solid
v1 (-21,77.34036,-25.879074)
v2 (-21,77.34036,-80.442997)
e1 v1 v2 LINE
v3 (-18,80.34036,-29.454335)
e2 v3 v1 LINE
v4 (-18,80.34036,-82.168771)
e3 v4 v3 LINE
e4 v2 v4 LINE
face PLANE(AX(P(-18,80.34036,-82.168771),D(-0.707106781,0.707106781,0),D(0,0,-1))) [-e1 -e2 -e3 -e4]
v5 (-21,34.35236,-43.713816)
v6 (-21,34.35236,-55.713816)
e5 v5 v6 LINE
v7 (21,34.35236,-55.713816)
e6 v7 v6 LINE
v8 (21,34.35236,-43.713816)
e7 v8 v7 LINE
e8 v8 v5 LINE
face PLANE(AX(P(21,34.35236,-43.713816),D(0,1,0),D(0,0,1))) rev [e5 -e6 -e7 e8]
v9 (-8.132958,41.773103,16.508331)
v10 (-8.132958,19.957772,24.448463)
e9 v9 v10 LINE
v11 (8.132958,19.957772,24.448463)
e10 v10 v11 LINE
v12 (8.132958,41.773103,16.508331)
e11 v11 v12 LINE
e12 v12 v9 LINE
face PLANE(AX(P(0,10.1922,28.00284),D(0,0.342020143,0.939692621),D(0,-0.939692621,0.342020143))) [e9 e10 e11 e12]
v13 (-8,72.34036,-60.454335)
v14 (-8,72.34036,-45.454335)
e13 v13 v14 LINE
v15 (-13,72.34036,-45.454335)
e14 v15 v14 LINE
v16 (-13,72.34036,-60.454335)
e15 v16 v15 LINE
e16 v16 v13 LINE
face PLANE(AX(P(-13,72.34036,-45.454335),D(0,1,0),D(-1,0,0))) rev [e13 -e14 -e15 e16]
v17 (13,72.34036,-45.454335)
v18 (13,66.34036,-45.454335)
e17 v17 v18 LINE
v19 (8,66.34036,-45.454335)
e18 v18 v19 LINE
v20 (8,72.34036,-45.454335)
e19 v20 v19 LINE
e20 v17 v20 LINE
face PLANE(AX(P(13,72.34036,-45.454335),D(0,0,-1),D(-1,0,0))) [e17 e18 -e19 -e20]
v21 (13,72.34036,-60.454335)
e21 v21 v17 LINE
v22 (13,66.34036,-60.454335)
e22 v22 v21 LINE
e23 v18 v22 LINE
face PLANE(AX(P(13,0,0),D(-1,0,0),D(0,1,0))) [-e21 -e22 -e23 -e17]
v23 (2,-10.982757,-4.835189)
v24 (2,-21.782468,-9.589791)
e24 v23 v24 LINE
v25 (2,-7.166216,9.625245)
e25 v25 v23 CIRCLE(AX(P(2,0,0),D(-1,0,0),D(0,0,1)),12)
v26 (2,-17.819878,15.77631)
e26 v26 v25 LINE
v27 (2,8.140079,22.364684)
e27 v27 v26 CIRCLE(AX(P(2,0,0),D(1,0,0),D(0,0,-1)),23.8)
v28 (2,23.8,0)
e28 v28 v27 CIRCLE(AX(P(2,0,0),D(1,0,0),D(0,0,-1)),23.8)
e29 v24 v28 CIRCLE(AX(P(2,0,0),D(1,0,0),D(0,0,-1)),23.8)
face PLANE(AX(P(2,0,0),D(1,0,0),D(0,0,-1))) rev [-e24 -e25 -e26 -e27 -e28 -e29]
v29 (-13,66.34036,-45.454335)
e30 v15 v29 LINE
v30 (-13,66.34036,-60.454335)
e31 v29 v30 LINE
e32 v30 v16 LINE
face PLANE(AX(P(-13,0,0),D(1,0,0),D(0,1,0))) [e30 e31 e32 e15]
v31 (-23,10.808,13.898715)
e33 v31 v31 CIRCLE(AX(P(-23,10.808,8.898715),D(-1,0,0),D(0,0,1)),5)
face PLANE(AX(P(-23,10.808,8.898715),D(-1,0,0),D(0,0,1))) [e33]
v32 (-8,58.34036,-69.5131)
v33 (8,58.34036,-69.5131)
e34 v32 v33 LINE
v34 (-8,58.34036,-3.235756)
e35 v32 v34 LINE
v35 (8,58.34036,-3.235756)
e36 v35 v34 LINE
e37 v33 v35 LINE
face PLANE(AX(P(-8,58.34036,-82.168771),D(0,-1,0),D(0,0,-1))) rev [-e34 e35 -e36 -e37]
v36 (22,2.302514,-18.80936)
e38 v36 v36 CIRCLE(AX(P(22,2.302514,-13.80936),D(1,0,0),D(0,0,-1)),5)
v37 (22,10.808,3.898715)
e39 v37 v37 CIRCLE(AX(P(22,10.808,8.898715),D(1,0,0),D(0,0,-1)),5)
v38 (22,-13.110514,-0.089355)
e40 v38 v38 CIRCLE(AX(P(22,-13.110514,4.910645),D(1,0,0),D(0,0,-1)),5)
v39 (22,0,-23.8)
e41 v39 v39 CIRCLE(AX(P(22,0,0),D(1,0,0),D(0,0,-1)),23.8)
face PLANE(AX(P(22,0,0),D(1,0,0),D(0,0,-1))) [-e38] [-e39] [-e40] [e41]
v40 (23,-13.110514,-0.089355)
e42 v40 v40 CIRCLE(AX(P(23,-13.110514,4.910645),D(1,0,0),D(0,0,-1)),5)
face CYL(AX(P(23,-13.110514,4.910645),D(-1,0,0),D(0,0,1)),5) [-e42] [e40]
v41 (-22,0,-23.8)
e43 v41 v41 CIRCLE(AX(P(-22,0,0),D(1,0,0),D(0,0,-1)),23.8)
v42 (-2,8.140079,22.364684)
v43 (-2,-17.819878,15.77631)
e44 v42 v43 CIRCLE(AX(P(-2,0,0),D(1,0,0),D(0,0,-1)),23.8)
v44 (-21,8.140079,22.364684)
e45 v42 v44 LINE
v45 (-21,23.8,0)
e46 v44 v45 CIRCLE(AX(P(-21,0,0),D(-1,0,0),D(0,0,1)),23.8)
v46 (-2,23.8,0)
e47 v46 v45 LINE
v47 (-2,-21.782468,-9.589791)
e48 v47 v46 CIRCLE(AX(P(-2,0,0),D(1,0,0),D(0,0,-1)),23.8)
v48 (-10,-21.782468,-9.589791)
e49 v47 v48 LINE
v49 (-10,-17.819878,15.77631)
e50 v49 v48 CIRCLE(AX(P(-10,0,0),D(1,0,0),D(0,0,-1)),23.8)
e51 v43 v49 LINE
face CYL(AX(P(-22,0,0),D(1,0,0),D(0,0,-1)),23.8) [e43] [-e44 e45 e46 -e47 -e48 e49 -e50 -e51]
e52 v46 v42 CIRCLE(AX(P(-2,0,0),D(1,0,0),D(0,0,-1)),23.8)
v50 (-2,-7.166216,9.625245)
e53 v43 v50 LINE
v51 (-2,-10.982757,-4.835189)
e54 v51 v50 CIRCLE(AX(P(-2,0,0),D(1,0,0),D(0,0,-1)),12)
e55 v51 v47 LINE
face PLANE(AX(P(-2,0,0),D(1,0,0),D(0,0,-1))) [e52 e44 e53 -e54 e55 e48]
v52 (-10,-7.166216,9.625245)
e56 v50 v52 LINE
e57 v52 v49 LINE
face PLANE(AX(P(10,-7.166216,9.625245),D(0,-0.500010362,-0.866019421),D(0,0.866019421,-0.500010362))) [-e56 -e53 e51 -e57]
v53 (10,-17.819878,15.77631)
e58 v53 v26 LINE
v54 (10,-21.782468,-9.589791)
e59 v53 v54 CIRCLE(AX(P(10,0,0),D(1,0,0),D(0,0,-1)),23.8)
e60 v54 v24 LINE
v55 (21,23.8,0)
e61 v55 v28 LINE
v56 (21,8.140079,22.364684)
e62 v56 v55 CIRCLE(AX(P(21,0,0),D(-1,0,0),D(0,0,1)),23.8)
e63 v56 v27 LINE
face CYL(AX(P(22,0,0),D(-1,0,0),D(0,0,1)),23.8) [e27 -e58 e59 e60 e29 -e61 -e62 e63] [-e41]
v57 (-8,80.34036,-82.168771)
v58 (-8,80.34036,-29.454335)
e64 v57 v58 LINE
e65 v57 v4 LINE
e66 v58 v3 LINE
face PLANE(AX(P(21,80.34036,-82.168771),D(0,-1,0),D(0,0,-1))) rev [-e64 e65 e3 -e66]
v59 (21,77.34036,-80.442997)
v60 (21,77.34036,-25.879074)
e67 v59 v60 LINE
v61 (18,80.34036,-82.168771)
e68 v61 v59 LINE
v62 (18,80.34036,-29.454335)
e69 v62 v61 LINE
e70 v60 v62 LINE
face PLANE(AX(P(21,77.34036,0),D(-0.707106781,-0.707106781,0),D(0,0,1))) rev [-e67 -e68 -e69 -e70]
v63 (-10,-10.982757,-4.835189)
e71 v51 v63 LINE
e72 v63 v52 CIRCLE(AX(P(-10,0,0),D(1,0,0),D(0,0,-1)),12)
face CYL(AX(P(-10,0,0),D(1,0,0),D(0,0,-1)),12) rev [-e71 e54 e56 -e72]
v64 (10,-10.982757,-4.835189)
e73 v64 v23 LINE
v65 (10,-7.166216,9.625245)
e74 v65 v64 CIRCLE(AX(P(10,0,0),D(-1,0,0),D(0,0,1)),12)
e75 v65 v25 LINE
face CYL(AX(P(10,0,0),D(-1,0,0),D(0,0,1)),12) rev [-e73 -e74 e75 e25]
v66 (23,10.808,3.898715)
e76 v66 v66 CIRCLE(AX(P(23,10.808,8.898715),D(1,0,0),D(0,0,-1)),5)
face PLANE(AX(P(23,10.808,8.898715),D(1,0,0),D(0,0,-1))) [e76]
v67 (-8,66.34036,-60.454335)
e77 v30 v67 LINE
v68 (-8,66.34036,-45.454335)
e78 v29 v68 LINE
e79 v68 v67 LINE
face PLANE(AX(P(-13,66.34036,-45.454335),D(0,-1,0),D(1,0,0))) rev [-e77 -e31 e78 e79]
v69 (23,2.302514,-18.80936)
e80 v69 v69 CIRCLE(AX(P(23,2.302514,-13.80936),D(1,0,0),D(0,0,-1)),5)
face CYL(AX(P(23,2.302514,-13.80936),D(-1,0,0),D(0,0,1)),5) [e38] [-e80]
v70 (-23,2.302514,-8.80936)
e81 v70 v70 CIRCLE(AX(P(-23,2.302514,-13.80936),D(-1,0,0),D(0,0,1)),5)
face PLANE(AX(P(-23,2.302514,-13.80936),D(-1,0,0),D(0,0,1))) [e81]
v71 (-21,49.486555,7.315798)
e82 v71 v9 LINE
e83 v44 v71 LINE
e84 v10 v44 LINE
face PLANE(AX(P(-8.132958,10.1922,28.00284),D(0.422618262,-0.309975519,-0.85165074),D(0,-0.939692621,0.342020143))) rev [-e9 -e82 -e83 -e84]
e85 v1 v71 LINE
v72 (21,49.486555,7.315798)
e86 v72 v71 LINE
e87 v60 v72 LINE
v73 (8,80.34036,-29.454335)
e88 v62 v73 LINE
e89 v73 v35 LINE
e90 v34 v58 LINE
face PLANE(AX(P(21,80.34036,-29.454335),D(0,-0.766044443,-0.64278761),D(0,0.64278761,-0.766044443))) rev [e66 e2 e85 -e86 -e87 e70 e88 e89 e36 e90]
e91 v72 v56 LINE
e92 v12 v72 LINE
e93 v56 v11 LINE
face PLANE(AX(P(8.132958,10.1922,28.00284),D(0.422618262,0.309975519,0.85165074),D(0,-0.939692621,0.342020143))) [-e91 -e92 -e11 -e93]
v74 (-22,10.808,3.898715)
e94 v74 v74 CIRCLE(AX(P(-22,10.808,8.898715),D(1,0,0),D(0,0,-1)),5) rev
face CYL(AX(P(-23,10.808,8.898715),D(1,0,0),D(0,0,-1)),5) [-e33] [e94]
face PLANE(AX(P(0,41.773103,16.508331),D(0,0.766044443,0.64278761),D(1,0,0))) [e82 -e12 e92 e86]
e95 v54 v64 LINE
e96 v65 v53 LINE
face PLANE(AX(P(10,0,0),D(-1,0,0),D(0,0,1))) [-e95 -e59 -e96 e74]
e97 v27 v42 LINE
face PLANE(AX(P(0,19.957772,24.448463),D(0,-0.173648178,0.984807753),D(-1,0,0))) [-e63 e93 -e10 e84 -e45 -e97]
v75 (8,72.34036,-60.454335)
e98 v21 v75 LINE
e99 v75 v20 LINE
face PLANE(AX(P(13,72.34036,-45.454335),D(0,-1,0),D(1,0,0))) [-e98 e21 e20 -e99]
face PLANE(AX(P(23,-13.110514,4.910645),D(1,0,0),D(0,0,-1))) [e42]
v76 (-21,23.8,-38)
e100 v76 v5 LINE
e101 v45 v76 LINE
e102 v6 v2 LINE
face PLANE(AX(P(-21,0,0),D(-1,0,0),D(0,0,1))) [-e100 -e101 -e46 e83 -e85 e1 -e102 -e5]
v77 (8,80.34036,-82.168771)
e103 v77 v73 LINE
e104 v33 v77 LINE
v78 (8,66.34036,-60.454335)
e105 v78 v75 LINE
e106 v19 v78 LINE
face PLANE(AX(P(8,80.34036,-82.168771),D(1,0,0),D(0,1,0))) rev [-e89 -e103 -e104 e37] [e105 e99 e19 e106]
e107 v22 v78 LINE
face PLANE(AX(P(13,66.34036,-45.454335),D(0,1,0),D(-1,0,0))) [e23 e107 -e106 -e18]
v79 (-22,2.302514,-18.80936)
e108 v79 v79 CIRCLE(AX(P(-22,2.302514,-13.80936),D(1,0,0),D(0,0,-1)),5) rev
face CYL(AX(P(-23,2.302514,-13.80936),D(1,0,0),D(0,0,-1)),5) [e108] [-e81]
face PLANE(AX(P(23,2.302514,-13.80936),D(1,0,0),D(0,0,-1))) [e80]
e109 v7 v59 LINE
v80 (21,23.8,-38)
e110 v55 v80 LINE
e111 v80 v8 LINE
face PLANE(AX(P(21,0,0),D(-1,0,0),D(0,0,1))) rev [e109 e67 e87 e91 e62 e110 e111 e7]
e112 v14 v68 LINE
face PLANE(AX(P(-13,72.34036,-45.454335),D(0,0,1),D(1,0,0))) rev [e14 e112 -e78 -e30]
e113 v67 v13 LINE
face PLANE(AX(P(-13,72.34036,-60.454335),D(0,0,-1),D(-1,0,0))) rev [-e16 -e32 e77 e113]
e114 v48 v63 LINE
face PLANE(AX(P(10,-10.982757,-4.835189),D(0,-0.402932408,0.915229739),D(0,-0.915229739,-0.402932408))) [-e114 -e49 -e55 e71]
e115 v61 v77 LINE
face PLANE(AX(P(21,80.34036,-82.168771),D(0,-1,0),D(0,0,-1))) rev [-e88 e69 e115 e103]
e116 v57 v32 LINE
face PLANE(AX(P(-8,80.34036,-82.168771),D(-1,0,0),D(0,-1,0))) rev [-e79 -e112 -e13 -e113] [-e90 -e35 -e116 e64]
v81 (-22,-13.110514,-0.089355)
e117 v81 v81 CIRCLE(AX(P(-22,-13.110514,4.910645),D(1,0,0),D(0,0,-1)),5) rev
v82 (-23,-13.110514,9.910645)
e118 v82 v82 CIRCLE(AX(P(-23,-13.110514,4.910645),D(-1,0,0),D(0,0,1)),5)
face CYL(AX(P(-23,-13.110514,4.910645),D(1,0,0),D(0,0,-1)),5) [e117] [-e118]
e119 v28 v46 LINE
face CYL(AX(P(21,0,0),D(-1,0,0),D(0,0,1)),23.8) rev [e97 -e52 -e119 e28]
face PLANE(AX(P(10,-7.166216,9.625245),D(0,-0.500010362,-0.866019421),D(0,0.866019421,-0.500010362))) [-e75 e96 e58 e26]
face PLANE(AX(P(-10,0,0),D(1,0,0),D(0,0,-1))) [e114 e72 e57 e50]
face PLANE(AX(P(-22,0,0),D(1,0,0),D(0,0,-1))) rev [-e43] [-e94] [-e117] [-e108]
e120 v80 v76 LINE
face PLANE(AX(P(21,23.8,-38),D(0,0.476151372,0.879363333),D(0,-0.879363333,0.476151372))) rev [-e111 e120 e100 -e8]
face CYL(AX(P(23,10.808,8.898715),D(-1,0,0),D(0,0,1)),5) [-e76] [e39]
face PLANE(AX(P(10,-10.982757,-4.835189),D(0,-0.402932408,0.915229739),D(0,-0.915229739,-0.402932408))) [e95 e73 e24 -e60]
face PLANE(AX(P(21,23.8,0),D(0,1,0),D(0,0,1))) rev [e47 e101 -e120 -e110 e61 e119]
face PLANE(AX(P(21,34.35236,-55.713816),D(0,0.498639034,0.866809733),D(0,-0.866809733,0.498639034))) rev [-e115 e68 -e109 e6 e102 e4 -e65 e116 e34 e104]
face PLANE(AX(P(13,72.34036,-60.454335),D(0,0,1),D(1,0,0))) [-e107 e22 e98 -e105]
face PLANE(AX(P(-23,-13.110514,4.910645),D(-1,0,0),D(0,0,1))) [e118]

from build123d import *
from OCP.BRepFilletAPI import BRepFilletAPI_MakeChamfer

# Parameters (mm, degrees)
BOSS_EXTRUDE1_START     = 1
SKETCH1_R               = 11.9
BOSS_EXTRUDE1_DEPTH     = 10
BOSS_EXTRUDE3_START     = -1
SKETCH1_3_R             = 11.9
BOSS_EXTRUDE3_DEPTH     = 10
SKETCH3_R               = 6
CUT_EXTRUDE1_DEPTH      = 4
SKETCH4_R               = 6
CUT_EXTRUDE2_DEPTH      = 4
BOSS_EXTRUDE9_DEPTH     = 10.5
BOSS_EXTRUDE10_DEPTH    = 3
CHAMFER4_SIZE           = 3
CHAMFER4_SIZE_2         = 5.196152423
CHAMFER5_SIZE           = 3
CHAMFER5_SIZE2          = 6.433520761528718
SKETCH17_R              = 2.500000000000001
SKETCH17_R_2            = 2.500000000000368
SKETCH17_R_3            = 2.5000000000002682
BOSS_EXTRUDE11_DEPTH    = 0.5
BOSS_EXTRUDE12_START    = 0.5
SKETCH18_R              = 2.5000000000000013
SKETCH18_R_2            = 2.5000000000003686
SKETCH18_R_3            = 2.500000000000268
BOSS_EXTRUDE12_DEPTH    = 0.5
CUT_EXTRUDE4_DEPTH      = 59.59880616896635
CHAMFER6_SIZE           = 1.5
SCALE1_SCALE            = 2
SKETCH20_W              = 15
SKETCH20_H              = 6
CUT_EXTRUDE5_DEPTH      = 5
CUT_EXTRUDE8_DEPTH      = 12
CUT_EXTRUDE8_DEPTH_BACK = 8


with BuildPart() as part:
    # Sketch1 → Boss-Extrude1 (new body)
    with BuildSketch(Plane(origin=(0, 0, 0), x_dir=(0, 0, -1), z_dir=(1, 0, 0)).offset(BOSS_EXTRUDE1_START)):
        Circle(SKETCH1_R)
    extrude(amount=BOSS_EXTRUDE1_DEPTH)

    # Sketch4 → Cut-Extrude2 (cut)
    with BuildSketch(Plane.ZY.offset(-1)):
        with Locations(Location((0, 0, 0), (0, 0, 180))):
            Circle(SKETCH4_R)
    extrude(amount=-CUT_EXTRUDE2_DEPTH, mode=Mode.SUBTRACT)



with BuildPart() as body_2:
    # Sketch1<3> → Boss-Extrude3 (new body)
    with BuildSketch(Plane(origin=(0, 0, 0), x_dir=(0, 0, -1), z_dir=(1, 0, 0)).offset(BOSS_EXTRUDE3_START)):
        Circle(SKETCH1_3_R)
    extrude(amount=-BOSS_EXTRUDE3_DEPTH)

    # Sketch3 → Cut-Extrude1 (cut)
    with BuildSketch(Plane(origin=(-1, 0, 0), x_dir=(0, 0, -1), z_dir=(1, 0, 0))):
        Circle(SKETCH3_R)
    extrude(amount=-CUT_EXTRUDE1_DEPTH, mode=Mode.SUBTRACT)


with BuildPart() as part_1:
    add(part.part)

    add(body_2.part)  # Boss-Extrude9 merges body 2
    # Sketch15 → Boss-Extrude9 (add, symmetric)
    with BuildSketch(Plane(origin=(0, 0, 0), x_dir=(0, 0, -1), z_dir=(1, 0, 0))):
        with BuildLine():
            Line((0, 11.9), (19, 11.9))
            Line((19, 11.9), (21.856908233869017, 17.17617999534241))
            Line((21.856908233869017, 17.17617999534241), (27.856908233869014, 17.176179995342412))
            Line((27.856908233869014, 17.176179995342412), (41.084385398468356, 40.17017999534242))
            Line((41.084385398468356, 40.17017999534242), (14.727167600667759, 40.170179995342416))
            Line((14.727167600667759, 40.170179995342416), (-3.657899034187683, 24.74327736286543))
            Line((-3.657899034187683, 24.74327736286543), (-11.182342187352324, 4.070039705575419))
            ThreePointArc((-11.182342187352324, 4.070039705575419), (-6.825559592577466, 9.74790932703899), (0, 11.9))
        make_face()
    extrude(amount=BOSS_EXTRUDE9_DEPTH, both=True)

    # Sketch16 → Boss-Extrude10 (add)
    with BuildSketch(Plane(origin=(0, 4.0700397055754225, 11.182342187352331), x_dir=(1, 0, 0), z_dir=(0, 0.34202014332566566, 0.9396926207859096))):
        Polygon((-10.5, 22.000000000000004), (-10.5, -1.3e-15), (-1, 0), (1, 0), (10.5, -1.3e-15), (10.5, 22.000000000000004), align=None)
    extrude(amount=BOSS_EXTRUDE10_DEPTH)

    # Chamfer4
    chamfer4_edges_1 = [part_1.edges().sort_by_distance(p)[0] for p in [
        (0, 5.096100135552418, 14.00142004971006),
    ]]
    chamfer4_side_1 = [part_1.faces().sort_by_distance(p)[0] for p in [
        (0, 5.075578926952878, 13.945038492462905),
    ]]
    chamfer4_edges_2 = [part_1.edges().sort_by_distance(p)[0] for p in [
        (0, 25.769337792842435, 6.4769768965454135),
    ]]
    chamfer4_side_2 = [part_1.faces().sort_by_distance(p)[0] for p in [
        (0, 25.712956235595282, 6.497498105144953),
    ]]
    chamfer4 = BRepFilletAPI_MakeChamfer(part_1.part.solid().wrapped)
    for e in chamfer4_edges_1:
        chamfer4.Add(CHAMFER4_SIZE - 0.0001, CHAMFER4_SIZE_2 - 0.0001, e.wrapped, chamfer4_side_1[0].wrapped)
    for e in chamfer4_edges_2:
        chamfer4.Add(CHAMFER4_SIZE_2 - 0.0001, CHAMFER4_SIZE - 0.0001, e.wrapped, chamfer4_side_2[0].wrapped)
    add(Compound.cast(chamfer4.Shape()), mode=Mode.REPLACE)  # a hair under: the kernel refuses the full size

    # Chamfer5: one chamfer whose edges measure the first distance from different faces: ONE call of the kernel's chamfer builder (chamfer() names one face for all edges)
    chamfer5_edges_1 = [part_1.edges().sort_by_distance(p)[0] for p in [
        (-10.5, 15.432718964197425, 10.239198473127738),
    ]]
    chamfer5_side_1 = [part_1.faces().sort_by_distance(p)[0] for p in [
        (-10.5, 25.100235238560476, -14.351576366544348),
    ]]
    chamfer5_edges_2 = [part_1.edges().sort_by_distance(p)[0] for p in [
        (10.5, 15.432718964197427, 10.239198473127736),
    ]]
    chamfer5_side_2 = [part_1.faces().sort_by_distance(p)[0] for p in [
        (10.5, 25.100235238560483, -14.35157636654435),
    ]]
    chamfer5 = BRepFilletAPI_MakeChamfer(part_1.part.solid().wrapped)
    for e in chamfer5_edges_1:
        chamfer5.Add(CHAMFER5_SIZE, CHAMFER5_SIZE2, e.wrapped, chamfer5_side_1[0].wrapped)  # the first distance lies on this face
    for e in chamfer5_edges_2:
        chamfer5.Add(CHAMFER5_SIZE, CHAMFER5_SIZE2, e.wrapped, chamfer5_side_2[0].wrapped)  # the first distance lies on this face
    add(Compound.cast(chamfer5.Shape()), mode=Mode.REPLACE)

    # Sketch17 → Boss-Extrude11 (add)
    with BuildSketch(Plane(origin=(11, 0, 0), x_dir=(0, 0, -1), z_dir=(1, 0, 0))):
        with Locations((-4.449357706456068, 5.404)):
            Circle(SKETCH17_R)
        with Locations((6.9046801352792615, 1.1512568043153382)):
            Circle(SKETCH17_R_2)
        with Locations((-2.4553224288227398, -6.5552568043149675)):
            Circle(SKETCH17_R_3)
    extrude(amount=BOSS_EXTRUDE11_DEPTH)

    # Sketch18 → Boss-Extrude12 (add)
    with BuildSketch(Plane.ZY.offset(11).offset(BOSS_EXTRUDE12_START)):
        with Locations(Location((4.449357706456068, 5.404, 0), (0, 0, 180))):
            Circle(SKETCH18_R)
        with Locations(Location((-6.9046801352792615, 1.1512568043153382, 0), (0, 0, 180))):
            Circle(SKETCH18_R_2)
        with Locations(Location((2.4553224288227398, -6.5552568043149675, 0), (0, 0, 180))):
            Circle(SKETCH18_R_3)
    extrude(amount=-BOSS_EXTRUDE12_DEPTH)

    # Sketch19 → Cut-Extrude4 (cut, through all)
    with BuildSketch(Plane.XY):
        Polygon((-4.000000000000002, 40.170179995342416), (4.000000000000002, 40.170179995342416), (4, 29.170179995342412), (-4, 29.170179995342412), align=None)
    extrude(amount=-CUT_EXTRUDE4_DEPTH, mode=Mode.SUBTRACT)

    # Chamfer6
    chamfer6_edges = [part_1.edges().sort_by_distance(p)[0] for p in [
        (-10.5, 40.17017999534242, -27.905776499568056),
        (10.5, 40.17017999534242, -27.905776499568056),
    ]]
    chamfer(chamfer6_edges, length=CHAMFER6_SIZE)


with BuildPart() as part_2:
    # Scale1: scaled about (0, 0, 0)
    add(part_1.part.scale(SCALE1_SCALE))

    # Sketch20 → Cut-Extrude5 (cut)
    with BuildSketch(Plane(origin=(-7.999999999999991, -1.26e-15, 0), x_dir=(0, 0, -1), z_dir=(1, 1.6e-16, 0))):
        with Locations((52.95433520133552, 69.34035999068483)):
            Rectangle(SKETCH20_W, SKETCH20_H)
    cut_extrude5 = extrude(amount=-CUT_EXTRUDE5_DEPTH, mode=Mode.SUBTRACT)

    # Mirror4: Cut-Extrude5 across plane
    add(cut_extrude5.mirror(Plane(origin=(0, 0, 0), x_dir=(0, 0, 1), z_dir=(1, 0, 0))), mode=Mode.SUBTRACT)

    # Sketch21 → Cut-Extrude8 (cut, two sides: drawn at the far end of the back side and taken through both)
    with BuildSketch(Plane(origin=(-2, 0, 0), x_dir=(0, 0, -1), z_dir=(1, 0, 0)).offset(-CUT_EXTRUDE8_DEPTH_BACK)):
        with BuildLine():
            Line((4.835188897605762, -10.982756863578018), (9.589791313584762, -21.78246777942974))
            ThreePointArc((9.589791313584762, -21.78246777942974), (-3.6733884927618106, -23.514808461504543), (-15.776309939282067, -17.819877796991495))
            Line((-15.776309939282067, -17.819877796991495), (-9.625245425797857, -7.166215911703854))
            ThreePointArc((-9.625245425797857, -7.166215911703854), (-3.062295967922119, -11.60268690454276), (4.835188897605762, -10.982756863578018))
        make_face()
    extrude(amount=CUT_EXTRUDE8_DEPTH + CUT_EXTRUDE8_DEPTH_BACK, mode=Mode.SUBTRACT)


solid = part_2.part
